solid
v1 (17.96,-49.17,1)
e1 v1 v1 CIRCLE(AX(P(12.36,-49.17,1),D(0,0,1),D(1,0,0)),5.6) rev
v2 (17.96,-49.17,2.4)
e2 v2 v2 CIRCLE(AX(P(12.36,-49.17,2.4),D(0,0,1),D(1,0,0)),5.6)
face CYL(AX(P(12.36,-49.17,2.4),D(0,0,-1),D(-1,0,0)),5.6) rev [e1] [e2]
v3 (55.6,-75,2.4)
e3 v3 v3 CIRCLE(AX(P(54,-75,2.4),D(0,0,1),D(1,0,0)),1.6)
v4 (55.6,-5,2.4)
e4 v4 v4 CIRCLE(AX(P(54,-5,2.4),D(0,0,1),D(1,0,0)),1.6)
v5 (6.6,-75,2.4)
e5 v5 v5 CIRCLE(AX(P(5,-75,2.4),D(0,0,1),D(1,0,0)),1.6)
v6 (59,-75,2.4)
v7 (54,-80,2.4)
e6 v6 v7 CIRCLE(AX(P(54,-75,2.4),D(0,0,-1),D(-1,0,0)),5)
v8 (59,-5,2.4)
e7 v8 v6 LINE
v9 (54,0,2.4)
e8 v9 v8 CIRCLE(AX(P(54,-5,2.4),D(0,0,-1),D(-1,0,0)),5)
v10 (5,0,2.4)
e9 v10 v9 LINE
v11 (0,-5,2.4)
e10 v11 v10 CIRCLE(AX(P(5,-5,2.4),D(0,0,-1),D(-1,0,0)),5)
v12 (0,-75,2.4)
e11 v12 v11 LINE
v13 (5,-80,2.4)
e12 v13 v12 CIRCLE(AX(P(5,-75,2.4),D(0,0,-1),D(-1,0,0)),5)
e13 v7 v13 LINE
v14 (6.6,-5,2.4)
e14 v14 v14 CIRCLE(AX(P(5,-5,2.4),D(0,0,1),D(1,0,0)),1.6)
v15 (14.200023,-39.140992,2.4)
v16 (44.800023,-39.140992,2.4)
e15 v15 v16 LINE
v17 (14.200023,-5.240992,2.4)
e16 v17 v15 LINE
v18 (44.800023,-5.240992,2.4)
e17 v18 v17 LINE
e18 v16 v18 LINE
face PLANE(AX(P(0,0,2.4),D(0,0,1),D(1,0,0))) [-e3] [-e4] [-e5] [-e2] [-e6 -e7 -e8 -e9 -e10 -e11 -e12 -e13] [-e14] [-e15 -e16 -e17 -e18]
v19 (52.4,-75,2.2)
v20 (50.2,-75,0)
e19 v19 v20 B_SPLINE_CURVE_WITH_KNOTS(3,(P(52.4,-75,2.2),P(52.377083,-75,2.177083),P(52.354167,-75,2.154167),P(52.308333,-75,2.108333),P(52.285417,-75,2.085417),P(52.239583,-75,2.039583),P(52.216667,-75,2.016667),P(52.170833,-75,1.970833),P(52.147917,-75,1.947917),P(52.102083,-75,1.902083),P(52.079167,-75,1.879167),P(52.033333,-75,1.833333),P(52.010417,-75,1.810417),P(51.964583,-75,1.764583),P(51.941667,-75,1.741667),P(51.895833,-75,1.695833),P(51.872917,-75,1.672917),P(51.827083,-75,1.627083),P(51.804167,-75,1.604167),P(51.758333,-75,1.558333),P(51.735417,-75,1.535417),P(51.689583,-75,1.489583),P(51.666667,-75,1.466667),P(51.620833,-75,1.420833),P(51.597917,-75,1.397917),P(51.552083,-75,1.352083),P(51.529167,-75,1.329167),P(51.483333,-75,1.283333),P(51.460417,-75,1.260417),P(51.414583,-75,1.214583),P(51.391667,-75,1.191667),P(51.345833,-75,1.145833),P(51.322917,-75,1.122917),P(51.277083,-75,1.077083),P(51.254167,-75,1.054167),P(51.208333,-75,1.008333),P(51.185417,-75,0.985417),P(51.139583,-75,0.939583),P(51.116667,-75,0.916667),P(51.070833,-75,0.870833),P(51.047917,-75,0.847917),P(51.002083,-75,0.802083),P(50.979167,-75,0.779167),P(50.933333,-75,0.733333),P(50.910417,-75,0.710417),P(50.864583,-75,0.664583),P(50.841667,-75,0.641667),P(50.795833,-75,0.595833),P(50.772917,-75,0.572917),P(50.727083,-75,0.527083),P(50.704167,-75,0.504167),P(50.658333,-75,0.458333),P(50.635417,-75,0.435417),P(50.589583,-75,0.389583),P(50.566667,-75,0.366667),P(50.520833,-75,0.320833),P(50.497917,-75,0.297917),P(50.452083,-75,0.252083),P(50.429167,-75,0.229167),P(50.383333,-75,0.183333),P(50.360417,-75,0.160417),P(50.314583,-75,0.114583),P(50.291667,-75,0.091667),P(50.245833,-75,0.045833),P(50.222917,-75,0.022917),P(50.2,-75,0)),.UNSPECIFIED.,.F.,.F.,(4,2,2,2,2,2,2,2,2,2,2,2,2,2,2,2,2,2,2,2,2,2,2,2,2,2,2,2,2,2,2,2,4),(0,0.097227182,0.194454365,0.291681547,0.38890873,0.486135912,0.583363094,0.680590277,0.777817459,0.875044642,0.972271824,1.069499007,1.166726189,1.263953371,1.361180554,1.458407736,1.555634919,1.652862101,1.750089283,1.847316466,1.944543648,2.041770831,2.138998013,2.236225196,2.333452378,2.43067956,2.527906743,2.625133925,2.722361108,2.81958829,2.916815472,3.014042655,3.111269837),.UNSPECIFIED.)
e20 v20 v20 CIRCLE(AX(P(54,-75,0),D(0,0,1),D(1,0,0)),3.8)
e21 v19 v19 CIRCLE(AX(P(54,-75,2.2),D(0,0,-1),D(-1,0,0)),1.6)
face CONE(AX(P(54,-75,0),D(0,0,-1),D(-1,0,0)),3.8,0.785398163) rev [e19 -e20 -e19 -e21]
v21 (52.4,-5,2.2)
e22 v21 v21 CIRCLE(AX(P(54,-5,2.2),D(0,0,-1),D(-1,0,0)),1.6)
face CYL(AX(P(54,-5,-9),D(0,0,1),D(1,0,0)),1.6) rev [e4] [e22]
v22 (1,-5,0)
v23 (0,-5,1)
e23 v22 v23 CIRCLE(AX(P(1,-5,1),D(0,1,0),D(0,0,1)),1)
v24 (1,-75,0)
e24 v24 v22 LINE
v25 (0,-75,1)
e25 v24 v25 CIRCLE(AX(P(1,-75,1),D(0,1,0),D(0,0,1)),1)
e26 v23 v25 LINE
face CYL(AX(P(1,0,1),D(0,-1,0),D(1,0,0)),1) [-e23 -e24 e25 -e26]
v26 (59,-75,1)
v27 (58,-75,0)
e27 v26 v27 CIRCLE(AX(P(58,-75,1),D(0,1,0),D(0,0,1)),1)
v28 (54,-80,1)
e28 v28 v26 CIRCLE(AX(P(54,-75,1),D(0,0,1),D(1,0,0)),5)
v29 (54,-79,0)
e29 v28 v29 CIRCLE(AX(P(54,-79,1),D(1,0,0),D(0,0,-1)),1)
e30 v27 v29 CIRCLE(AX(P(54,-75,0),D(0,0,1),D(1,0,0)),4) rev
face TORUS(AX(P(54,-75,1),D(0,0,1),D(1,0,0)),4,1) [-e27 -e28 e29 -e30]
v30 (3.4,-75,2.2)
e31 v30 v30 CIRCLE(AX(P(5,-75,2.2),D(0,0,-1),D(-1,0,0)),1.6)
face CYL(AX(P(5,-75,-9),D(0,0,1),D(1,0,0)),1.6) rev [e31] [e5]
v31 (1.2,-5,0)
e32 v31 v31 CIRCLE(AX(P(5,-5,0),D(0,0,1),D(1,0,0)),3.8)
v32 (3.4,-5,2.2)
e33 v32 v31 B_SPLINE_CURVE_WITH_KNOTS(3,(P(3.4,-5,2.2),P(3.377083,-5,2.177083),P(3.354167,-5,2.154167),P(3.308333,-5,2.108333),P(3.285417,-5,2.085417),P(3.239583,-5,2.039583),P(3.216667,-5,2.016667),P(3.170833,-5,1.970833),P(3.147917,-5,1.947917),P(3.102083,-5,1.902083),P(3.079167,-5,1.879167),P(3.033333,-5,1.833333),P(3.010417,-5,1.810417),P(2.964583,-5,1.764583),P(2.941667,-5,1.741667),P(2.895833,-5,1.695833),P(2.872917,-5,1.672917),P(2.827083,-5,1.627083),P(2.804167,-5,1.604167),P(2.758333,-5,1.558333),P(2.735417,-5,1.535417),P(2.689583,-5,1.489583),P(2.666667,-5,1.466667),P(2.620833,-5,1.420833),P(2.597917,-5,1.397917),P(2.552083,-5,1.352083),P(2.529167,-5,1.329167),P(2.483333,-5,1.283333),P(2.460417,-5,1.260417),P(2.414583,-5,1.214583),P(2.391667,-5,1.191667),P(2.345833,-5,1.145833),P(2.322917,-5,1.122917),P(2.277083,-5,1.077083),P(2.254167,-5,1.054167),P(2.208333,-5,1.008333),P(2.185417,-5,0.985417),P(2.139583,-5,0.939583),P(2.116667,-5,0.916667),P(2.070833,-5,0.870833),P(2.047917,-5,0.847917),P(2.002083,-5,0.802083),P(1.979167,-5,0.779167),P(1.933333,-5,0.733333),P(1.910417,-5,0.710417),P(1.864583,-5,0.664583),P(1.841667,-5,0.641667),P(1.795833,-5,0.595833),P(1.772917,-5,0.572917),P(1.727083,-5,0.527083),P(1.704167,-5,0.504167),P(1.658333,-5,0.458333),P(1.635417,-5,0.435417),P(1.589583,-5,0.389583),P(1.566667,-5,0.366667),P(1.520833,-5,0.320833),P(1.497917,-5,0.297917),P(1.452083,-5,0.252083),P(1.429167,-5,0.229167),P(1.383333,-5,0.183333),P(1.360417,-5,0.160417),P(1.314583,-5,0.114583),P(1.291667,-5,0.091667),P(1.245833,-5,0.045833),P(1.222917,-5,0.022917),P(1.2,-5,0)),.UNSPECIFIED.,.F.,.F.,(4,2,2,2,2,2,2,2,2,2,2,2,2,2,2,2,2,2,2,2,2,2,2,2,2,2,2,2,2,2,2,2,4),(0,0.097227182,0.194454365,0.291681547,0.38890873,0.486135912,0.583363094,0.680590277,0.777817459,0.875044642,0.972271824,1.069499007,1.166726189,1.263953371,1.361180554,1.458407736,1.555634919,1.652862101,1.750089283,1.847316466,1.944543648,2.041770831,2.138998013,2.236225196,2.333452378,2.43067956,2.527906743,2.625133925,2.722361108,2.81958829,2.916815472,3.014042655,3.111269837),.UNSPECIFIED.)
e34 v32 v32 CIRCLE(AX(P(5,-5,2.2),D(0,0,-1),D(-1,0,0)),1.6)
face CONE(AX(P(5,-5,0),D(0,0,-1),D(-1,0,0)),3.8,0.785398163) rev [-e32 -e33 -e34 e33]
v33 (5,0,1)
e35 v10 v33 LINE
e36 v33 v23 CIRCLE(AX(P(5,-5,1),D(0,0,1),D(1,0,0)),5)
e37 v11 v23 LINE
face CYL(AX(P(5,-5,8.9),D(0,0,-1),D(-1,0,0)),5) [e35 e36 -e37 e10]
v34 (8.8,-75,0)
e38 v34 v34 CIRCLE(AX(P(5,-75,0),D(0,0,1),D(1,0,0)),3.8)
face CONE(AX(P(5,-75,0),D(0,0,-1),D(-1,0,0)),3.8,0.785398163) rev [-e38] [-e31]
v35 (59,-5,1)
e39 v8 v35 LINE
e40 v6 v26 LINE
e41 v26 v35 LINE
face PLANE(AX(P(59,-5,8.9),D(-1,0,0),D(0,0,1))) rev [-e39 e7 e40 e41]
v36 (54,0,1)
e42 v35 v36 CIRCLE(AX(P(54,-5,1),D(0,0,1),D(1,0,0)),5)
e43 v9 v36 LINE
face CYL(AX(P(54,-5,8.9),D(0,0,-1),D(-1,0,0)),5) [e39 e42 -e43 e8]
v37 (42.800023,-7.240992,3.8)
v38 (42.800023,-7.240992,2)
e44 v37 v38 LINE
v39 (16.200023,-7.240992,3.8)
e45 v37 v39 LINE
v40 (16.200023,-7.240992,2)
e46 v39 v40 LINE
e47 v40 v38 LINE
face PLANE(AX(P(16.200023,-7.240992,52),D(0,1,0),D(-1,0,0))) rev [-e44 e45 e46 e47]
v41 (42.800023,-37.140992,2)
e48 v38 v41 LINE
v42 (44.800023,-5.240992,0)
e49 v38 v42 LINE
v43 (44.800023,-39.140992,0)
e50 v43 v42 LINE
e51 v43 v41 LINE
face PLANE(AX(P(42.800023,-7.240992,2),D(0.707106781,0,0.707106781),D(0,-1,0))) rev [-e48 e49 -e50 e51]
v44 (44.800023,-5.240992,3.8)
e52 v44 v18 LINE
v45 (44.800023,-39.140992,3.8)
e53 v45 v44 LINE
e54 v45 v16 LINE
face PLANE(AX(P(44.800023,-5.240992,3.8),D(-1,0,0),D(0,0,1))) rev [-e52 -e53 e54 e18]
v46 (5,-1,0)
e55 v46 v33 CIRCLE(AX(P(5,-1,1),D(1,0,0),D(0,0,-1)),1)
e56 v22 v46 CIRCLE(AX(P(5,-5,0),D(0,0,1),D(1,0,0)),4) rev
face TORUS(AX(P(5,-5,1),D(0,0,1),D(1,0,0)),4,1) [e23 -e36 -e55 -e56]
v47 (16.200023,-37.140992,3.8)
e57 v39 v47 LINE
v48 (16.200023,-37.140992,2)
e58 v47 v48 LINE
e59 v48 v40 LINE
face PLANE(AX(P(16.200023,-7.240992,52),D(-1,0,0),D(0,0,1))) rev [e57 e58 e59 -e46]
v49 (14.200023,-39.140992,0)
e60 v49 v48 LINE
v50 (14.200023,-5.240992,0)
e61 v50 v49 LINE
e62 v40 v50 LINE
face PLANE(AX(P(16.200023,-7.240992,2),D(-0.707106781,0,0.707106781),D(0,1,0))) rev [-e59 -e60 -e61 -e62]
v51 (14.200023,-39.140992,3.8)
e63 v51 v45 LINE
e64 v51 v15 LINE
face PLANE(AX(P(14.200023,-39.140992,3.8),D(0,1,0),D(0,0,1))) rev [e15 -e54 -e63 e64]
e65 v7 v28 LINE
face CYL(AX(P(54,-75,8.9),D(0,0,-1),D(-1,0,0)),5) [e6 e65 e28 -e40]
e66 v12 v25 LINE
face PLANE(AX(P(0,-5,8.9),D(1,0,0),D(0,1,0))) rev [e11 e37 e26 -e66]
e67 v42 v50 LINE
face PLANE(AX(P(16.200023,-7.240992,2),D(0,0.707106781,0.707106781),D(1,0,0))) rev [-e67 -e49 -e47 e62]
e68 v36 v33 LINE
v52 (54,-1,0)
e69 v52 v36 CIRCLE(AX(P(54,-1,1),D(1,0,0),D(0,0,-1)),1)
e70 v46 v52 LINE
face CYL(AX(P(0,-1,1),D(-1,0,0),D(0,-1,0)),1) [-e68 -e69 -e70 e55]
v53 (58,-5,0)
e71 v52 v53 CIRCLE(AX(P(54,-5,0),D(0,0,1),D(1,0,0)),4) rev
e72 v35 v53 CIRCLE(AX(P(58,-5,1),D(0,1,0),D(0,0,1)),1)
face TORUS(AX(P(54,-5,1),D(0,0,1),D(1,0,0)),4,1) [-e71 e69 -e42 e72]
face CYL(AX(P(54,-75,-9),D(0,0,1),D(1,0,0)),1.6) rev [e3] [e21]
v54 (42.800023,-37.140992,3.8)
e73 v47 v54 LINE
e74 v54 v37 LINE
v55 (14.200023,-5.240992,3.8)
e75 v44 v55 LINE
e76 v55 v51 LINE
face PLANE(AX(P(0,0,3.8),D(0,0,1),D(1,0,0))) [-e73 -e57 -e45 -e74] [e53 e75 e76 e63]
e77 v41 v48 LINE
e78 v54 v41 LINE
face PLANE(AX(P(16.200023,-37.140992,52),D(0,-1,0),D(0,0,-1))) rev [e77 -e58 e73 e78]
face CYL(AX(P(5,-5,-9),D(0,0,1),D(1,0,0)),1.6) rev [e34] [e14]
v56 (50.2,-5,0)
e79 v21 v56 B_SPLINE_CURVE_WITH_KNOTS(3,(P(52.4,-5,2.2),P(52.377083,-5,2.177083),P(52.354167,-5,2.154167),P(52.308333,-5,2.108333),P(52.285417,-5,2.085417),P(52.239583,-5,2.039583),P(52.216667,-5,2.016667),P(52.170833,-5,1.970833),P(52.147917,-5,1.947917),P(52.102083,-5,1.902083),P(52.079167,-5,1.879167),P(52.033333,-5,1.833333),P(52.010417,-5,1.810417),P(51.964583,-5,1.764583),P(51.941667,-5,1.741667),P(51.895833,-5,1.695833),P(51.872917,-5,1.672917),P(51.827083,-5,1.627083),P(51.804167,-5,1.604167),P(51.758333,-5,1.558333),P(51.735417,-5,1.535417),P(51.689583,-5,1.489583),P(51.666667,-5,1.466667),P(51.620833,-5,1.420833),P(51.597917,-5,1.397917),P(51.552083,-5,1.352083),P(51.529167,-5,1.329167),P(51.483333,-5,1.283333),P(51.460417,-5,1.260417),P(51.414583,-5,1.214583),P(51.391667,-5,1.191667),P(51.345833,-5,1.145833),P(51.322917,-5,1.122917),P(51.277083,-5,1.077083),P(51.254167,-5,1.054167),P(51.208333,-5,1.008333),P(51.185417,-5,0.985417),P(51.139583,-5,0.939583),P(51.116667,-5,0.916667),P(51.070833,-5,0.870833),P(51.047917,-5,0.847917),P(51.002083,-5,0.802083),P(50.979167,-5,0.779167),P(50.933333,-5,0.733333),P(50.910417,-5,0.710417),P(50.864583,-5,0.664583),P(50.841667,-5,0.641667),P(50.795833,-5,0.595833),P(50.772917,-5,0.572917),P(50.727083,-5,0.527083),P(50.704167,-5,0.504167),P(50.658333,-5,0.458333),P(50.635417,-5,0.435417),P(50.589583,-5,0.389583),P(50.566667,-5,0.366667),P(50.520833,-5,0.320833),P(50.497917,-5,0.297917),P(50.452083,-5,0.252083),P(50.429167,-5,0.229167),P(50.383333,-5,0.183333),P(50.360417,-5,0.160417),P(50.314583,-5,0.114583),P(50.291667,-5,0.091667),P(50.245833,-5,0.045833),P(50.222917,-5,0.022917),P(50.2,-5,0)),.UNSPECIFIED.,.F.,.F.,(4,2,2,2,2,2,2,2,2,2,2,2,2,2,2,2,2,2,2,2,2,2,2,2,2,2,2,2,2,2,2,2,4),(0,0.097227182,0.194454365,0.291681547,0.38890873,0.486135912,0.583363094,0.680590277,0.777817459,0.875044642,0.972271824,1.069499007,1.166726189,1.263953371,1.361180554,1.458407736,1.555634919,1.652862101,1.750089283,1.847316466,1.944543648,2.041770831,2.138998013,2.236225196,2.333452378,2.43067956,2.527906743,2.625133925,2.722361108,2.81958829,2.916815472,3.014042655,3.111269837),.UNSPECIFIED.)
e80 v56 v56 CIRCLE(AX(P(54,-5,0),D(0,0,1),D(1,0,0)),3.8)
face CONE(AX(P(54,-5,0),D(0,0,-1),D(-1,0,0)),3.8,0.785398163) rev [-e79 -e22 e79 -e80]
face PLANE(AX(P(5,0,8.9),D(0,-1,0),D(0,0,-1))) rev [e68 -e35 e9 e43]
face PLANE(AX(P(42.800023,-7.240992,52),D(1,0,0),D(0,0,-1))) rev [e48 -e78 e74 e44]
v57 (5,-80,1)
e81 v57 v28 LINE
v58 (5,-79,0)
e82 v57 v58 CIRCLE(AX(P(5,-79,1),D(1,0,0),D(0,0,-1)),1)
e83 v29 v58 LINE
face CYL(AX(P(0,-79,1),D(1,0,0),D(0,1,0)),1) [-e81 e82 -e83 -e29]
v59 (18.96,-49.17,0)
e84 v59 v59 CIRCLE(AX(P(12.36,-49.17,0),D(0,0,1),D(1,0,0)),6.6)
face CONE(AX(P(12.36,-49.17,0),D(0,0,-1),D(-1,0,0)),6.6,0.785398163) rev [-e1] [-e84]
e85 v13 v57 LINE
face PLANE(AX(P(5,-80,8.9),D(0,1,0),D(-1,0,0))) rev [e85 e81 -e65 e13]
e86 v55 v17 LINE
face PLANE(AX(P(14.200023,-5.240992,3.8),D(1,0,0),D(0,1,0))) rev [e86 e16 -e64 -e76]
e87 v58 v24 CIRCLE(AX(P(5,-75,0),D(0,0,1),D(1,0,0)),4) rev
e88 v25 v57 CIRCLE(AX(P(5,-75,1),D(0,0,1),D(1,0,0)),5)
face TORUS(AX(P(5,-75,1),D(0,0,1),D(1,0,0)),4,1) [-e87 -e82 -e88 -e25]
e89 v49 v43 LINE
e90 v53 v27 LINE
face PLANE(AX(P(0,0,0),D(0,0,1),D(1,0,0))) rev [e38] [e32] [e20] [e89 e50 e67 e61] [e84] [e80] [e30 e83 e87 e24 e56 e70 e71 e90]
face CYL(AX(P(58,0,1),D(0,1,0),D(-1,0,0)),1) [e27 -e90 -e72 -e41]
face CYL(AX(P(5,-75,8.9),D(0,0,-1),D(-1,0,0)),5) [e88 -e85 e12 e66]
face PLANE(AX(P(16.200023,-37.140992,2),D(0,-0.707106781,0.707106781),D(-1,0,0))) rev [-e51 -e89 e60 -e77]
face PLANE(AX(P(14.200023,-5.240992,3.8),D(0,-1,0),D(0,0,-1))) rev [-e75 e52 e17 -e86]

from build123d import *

# Parameters (mm, degrees)
SKETCH_1_W           = 59
SKETCH_1_H           = 80
SKETCH_1_R           = 5.6
EXTRUDE_1_DEPTH      = 2.4
SKETCH_4_W           = 59
SKETCH_4_H           = 80
EXTRUDE_6_DEPTH      = 5.5
FILLET_1_R           = 5
FILLET_2_R           = 5
SKETCH_14_R          = 3
SKETCH_14_R_2        = 1.3
EXTRUDE_7_DEPTH      = 6.5
EXTRUDE_10_DEPTH     = 1
FILLET_3_R           = 1
CUT_EXTRUDE_1_DEPTH  = 10
SKETCH_23_W          = 26.6
SKETCH_23_H          = 29.9
CUT_EXTRUDE_4_DEPTH  = 52
SKETCH_24_W          = 26.6
SKETCH_24_H          = 5
EXTRUDE_11_DEPTH     = 0.2
SKETCH_25_W          = 26.6
SKETCH_25_H          = 5
EXTRUDE_12_DEPTH     = 0.2
SKETCH_26_R          = 3.14740537
SKETCH_26_R_2        = 1.3
EXTRUDE_13_DEPTH     = 6.5
CUT_EXTRUDE_5_DEPTH  = 0.6
CHAMFER_1_SIZE       = 2
CHAMFER_2_SIZE       = 1
EXTRUDE_16_DEPTH     = 6.5
EXTRUDE_16_2_DEPTH   = 6.5
EXTRUDE_16_3_DEPTH   = 6.5
EXTRUDE_16_4_DEPTH   = 6.5
EXTRUDE_16_5_DEPTH   = 6.5
EXTRUDE_16_6_DEPTH   = 6.5
EXTRUDE_17_REACH     = 101.616
SKETCH_34_R          = 1.3
CUT_EXTRUDE_7_DEPTH  = 10
SKETCH_33_W          = 70.771509838
SKETCH_33_H          = 90.701063175
CUT_EXTRUDE_6_DEPTH  = 10
CHAMFER_3_SIZE       = 2.5
SKETCH_35_W          = 30.6
SKETCH_35_H          = 33.9
SKETCH_35_W_2        = 26.6
SKETCH_35_H_2        = 29.9
EXTRUDE_18_DEPTH     = 1.4
SKETCH_37_R          = 1.6
CUT_EXTRUDE_11_DEPTH = 11.4


with BuildPart() as part:
    # Эскиз1 → Бобышка-Вытянуть1 (new body)
    with BuildSketch(Plane.XY):
        with Locations((29.5, -40)):
            Rectangle(SKETCH_1_W, SKETCH_1_H)
        with Locations((12.36, -49.17)):
            Circle(SKETCH_1_R, mode=Mode.SUBTRACT)
    extrude(amount=EXTRUDE_1_DEPTH)

    # Эскиз4 → Бобышка-Вытянуть6 (add)
    with BuildSketch(Plane.XY.offset(2.4)):
        with Locations((29.5, -40)):
            Rectangle(SKETCH_4_W, SKETCH_4_H)
        with BuildLine():
            Line((5.1, -2), (53.9, -2))
            ThreePointArc((53.9, -2), (56.092031022, -2.907968978), (57, -5.1))
            Line((57, -5.1), (57, -74.9))
            ThreePointArc((57, -74.9), (56.092031022, -77.092031022), (53.9, -78))
            Line((53.9, -78), (5.1, -78))
            ThreePointArc((5.1, -78), (2.907968978, -77.092031022), (2, -74.9))
            Line((2, -74.9), (2, -5.1))
            ThreePointArc((2, -5.1), (2.907968978, -2.907968978), (5.1, -2))
        make_face(mode=Mode.SUBTRACT)
    extrude(amount=EXTRUDE_6_DEPTH)

    # Скругление1
    fillet_1_edges = [part.edges().sort_by_distance(p)[0] for p in [
        (0, 0, 3.95),
    ]]
    fillet(fillet_1_edges, radius=FILLET_1_R)

    # Скругление2
    fillet_2_edges = [part.edges().sort_by_distance(p)[0] for p in [
        (59, 0, 3.95),
        (59, -80, 3.95),
        (0, -80, 3.95),
    ]]
    fillet(fillet_2_edges, radius=FILLET_2_R)

    # Эскиз14 → Бобышка-Вытянуть7 (add)
    # profile 1 of 4: a face of its own
    with BuildSketch(Plane.XY.offset(2.4)):
        with Locations(Location((5, -5, 0), (0, 0, 180.947144451))):
            Circle(SKETCH_14_R)
        with Locations(Location((5, -5, 0), (0, 0, 180))):
            Circle(SKETCH_14_R_2, mode=Mode.SUBTRACT)
    # profile 2 of 4: a face of its own
    with BuildSketch(Plane.XY.offset(2.4)):
        with Locations(Location((5, -75, 0), (0, 0, 179.052855549))):
            Circle(SKETCH_14_R)
        with Locations(Location((5, -75, 0), (0, 0, 180))):
            Circle(SKETCH_14_R_2, mode=Mode.SUBTRACT)
    # profile 3 of 4: a face of its own
    with BuildSketch(Plane.XY.offset(2.4)):
        with Locations(Location((54, -75, 0), (0, 0, 269.052855549))):
            Circle(SKETCH_14_R)
        with Locations(Location((54, -75, 0), (0, 0, 180))):
            Circle(SKETCH_14_R_2, mode=Mode.SUBTRACT)
    # profile 4 of 4: a face of its own
    with BuildSketch(Plane.XY.offset(2.4)):
        with Locations(Location((54, -5, 0), (0, 0, 90.947144451))):
            Circle(SKETCH_14_R)
        with Locations(Location((54, -5, 0), (0, 0, 180))):
            Circle(SKETCH_14_R_2, mode=Mode.SUBTRACT)
    extrude(amount=EXTRUDE_7_DEPTH)

    # Скругление3
    fillet_3_edges = [part.edges().sort_by_distance(p)[0] for p in [
        (0, -40, 0),
        (1.464466094, -1.464466094, 0),
        (29.5, -80, 0),
        (29.5, 0, 0),
        (59, -40, 0),
        (57.535533906, -1.464466094, 0),
        (57.535533906, -78.535533906, 0),
        (1.464466094, -78.535533906, 0),
    ]]
    fillet(fillet_3_edges, radius=FILLET_3_R)


with BuildPart() as body_2:
    # Эскиз15 → Бобышка-Вытянуть10 (new body)
    with BuildSketch(Plane.XY.offset(7.9)):
        with BuildLine():
            Line((5, 0), (54, 0))
            ThreePointArc((54, 0), (57.535533906, -1.464466094), (59, -5))
            Line((59, -5), (59, -75))
            ThreePointArc((59, -75), (57.535533906, -78.535533906), (54, -80))
            Line((54, -80), (5, -80))
            ThreePointArc((5, -80), (1.464466094, -78.535533906), (0, -75))
            Line((0, -75), (0, -5))
            ThreePointArc((0, -5), (1.464466094, -1.464466094), (5, 0))
        make_face()
        with BuildLine():
            Line((5, -1), (54, -1))
            ThreePointArc((54, -1), (56.828427125, -2.171572875), (58, -5))
            Line((58, -5), (58, -75))
            ThreePointArc((58, -75), (56.828427125, -77.828427125), (54, -79))
            Line((54, -79), (5, -79))
            ThreePointArc((5, -79), (2.171572875, -77.828427125), (1, -75))
            Line((1, -75), (1, -5))
            ThreePointArc((1, -5), (2.171572875, -2.171572875), (5, -1))
        make_face(mode=Mode.SUBTRACT)
    extrude(amount=EXTRUDE_10_DEPTH)


with BuildPart() as cut_extrude_1_tool:
    # Эскиз20 → Вырез-Вытянуть1 (new body)
    with BuildSketch(Plane(origin=(59, 0, 0), x_dir=(0, 0, -1), z_dir=(1, 0, 0))):
        with BuildLine():
            Line((-8.9, -11.15), (-5.2, -11.15))
            ThreePointArc((-5.2, -11.15), (-4.492893219, -11.442893219), (-4.2, -12.15))
            Line((-4.2, -12.15), (-4.2, -18.25))
            ThreePointArc((-4.2, -18.25), (-4.492893219, -18.957106781), (-5.2, -19.25))
            Line((-5.2, -19.25), (-8.9, -19.25))
            Line((-8.9, -19.25), (-8.9, -11.15))
        make_face()
    extrude(amount=-CUT_EXTRUDE_1_DEPTH)


with BuildPart() as part_1:
    add(part.part)

    # Вырез-Вытянуть1: cut by cut_extrude_1_tool
    add(cut_extrude_1_tool.part, mode=Mode.SUBTRACT)

    # Эскиз23 → Вырез-Вытянуть4 (cut)
    with BuildSketch(Plane(origin=(0, 0, 0), x_dir=(-1, 0, 0), z_dir=(0, 0, -1))):
        with Locations((-29.500023272, -22.190991649)):
            Rectangle(SKETCH_23_W, SKETCH_23_H)
    extrude(amount=-CUT_EXTRUDE_4_DEPTH, mode=Mode.SUBTRACT)

    # Эскиз24 → Бобышка-Вытянуть11 (add)
    with BuildSketch(Plane.XY.offset(2.4)):
        with Locations((29.500023272, -4.740991649)):
            Rectangle(SKETCH_24_W, SKETCH_24_H)
    extrude(amount=EXTRUDE_11_DEPTH)

    # Эскиз25 → Бобышка-Вытянуть12 (add)
    with BuildSketch(Plane.XY.offset(2.4)):
        with Locations((29.500023272, -39.640991649)):
            Rectangle(SKETCH_25_W, SKETCH_25_H)
    extrude(amount=EXTRUDE_12_DEPTH)


with BuildPart() as body_2_1:
    add(body_2.part)

    # Вырез-Вытянуть1: cut by cut_extrude_1_tool
    add(cut_extrude_1_tool.part, mode=Mode.SUBTRACT)


    add(part_1.part)  # Бобышка-Вытянуть13 merges part
    # Эскиз26 → Бобышка-Вытянуть13 (add)
    with BuildSketch(Plane.XY.offset(2.4)):
        with Locations(Location((46.9, -5.7, 0), (0, 0, 180))):
            Circle(SKETCH_26_R)
        with Locations(Location((46.9, -5.7, 0), (0, 0, 180))):
            Circle(SKETCH_26_R_2, mode=Mode.SUBTRACT)
    extrude(amount=EXTRUDE_13_DEPTH)

    # Эскиз27 → Вырез-Вытянуть5 (cut)
    with BuildSketch(Plane.XY.offset(7.9)):
        with BuildLine():
            Line((58, -75), (58, -19.25))
            Line((58, -19.25), (57, -19.25))
            Line((57, -19.25), (57, -74.9))
            ThreePointArc((57, -74.9), (56.999897526, -74.925205779), (56.999590109, -74.950409891))
            ThreePointArc((56.999590109, -74.950409891), (56.121320344, -77.121320344), (53.950409891, -77.999590109))
            ThreePointArc((53.950409891, -77.999590109), (53.925205779, -77.999897526), (53.9, -78))
            Line((53.9, -78), (5.1, -78))
            ThreePointArc((5.1, -78), (5.074794221, -77.999897526), (5.049590109, -77.999590109))
            ThreePointArc((5.049590109, -77.999590109), (2.878679656, -77.121320344), (2.000409891, -74.950409891))
            ThreePointArc((2.000409891, -74.950409891), (2.000102474, -74.925205779), (2, -74.9))
            Line((2, -74.9), (2, -5.1))
            ThreePointArc((2, -5.1), (2.000102474, -5.074794221), (2.000409891, -5.049590109))
            ThreePointArc((2.000409891, -5.049590109), (2.878679656, -2.878679656), (5.049590109, -2.000409891))
            ThreePointArc((5.049590109, -2.000409891), (5.074794221, -2.000102474), (5.1, -2))
            Line((5.1, -2), (53.9, -2))
            ThreePointArc((53.9, -2), (53.925205779, -2.000102474), (53.950409891, -2.000409891))
            ThreePointArc((53.950409891, -2.000409891), (56.121320344, -2.878679656), (56.999590109, -5.049590109))
            ThreePointArc((56.999590109, -5.049590109), (56.999897526, -5.074794221), (57, -5.1))
            Line((57, -5.1), (57, -11.15))
            Line((57, -11.15), (58, -11.15))
            Line((58, -11.15), (58, -5))
            ThreePointArc((58, -5), (56.828427125, -2.171572875), (54, -1))
            Line((54, -1), (5, -1))
            ThreePointArc((5, -1), (2.171572875, -2.171572875), (1, -5))
            Line((1, -5), (1, -75))
            ThreePointArc((1, -75), (2.171572875, -77.828427125), (5, -79))
            Line((5, -79), (54, -79))
            ThreePointArc((54, -79), (56.828427125, -77.828427125), (58, -75))
        make_face()
    extrude(amount=-CUT_EXTRUDE_5_DEPTH, mode=Mode.SUBTRACT)

    # Фаска1
    chamfer_1_edges = [body_2_1.edges().sort_by_distance(p)[0] for p in [
        (16.200023272, -22.190991649, 0),
        (29.500023272, -37.140991649, 0),
        (42.800023272, -22.190991649, 0),
        (29.500023272, -7.240991649, 0),
    ]]
    chamfer(chamfer_1_edges, length=CHAMFER_1_SIZE)

    # Фаска2
    chamfer_2_edges = [body_2_1.edges().sort_by_distance(p)[0] for p in [
        (6.76, -49.17, 0),
    ]]
    chamfer(chamfer_2_edges, length=CHAMFER_2_SIZE)

    # Бобышка-Вытянуть17: up to this face of the body (flat: up to its plane)
    extrude_17_end = Plane(body_2_1.part.faces().sort_by_distance((49.958383303, -5.7, 8.9))[0])
    # Эскиз31 → Бобышка-Вытянуть17 (add, up to the picked face)
    with BuildSketch(Plane.XY.offset(2.4), mode=Mode.PRIVATE) as extrude_17_sk1:
        Polygon((5, -2), (8, -2), (8, -5), align=None)
    extrude_17_tool1 = split(extrude(extrude_17_sk1.sketch, amount=EXTRUDE_17_REACH, mode=Mode.PRIVATE), bisect_by=extrude_17_end, keep=Keep.BOTH, mode=Mode.PRIVATE)
    # Эскиз31 → Бобышка-Вытянуть17 (add, up to the picked face)
    with BuildSketch(Plane.XY.offset(2.4), mode=Mode.PRIVATE) as extrude_17_sk2:
        Polygon((5, -8), (2, -8), (2, -5.1), align=None)
    extrude_17_tool2 = split(extrude(extrude_17_sk2.sketch, amount=EXTRUDE_17_REACH, mode=Mode.PRIVATE), bisect_by=extrude_17_end, keep=Keep.BOTH, mode=Mode.PRIVATE)
    # Эскиз31 → Бобышка-Вытянуть17 (add, up to the picked face)
    with BuildSketch(Plane.XY.offset(2.4), mode=Mode.PRIVATE) as extrude_17_sk3:
        Polygon((50.04740537, -5.7), (50.04740537, -2), (43.75259463, -2), (43.753891914, -5.790357503), (46.9, -2.55259463), align=None)
    extrude_17_tool3 = split(extrude(extrude_17_sk3.sketch, amount=EXTRUDE_17_REACH, mode=Mode.PRIVATE), bisect_by=extrude_17_end, keep=Keep.BOTH, mode=Mode.PRIVATE)
    # Эскиз31 → Бобышка-Вытянуть17 (add, up to the picked face)
    with BuildSketch(Plane.XY.offset(2.4), mode=Mode.PRIVATE) as extrude_17_sk4:
        Polygon((57, -5), (54, -8), (57, -8), align=None)
    extrude_17_tool4 = split(extrude(extrude_17_sk4.sketch, amount=EXTRUDE_17_REACH, mode=Mode.PRIVATE), bisect_by=extrude_17_end, keep=Keep.BOTH, mode=Mode.PRIVATE)
    # Эскиз31 → Бобышка-Вытянуть17 (add, up to the picked face)
    with BuildSketch(Plane.XY.offset(2.4), mode=Mode.PRIVATE) as extrude_17_sk5:
        Polygon((54, -2), (51, -2), (51, -5), align=None)
    extrude_17_tool5 = split(extrude(extrude_17_sk5.sketch, amount=EXTRUDE_17_REACH, mode=Mode.PRIVATE), bisect_by=extrude_17_end, keep=Keep.BOTH, mode=Mode.PRIVATE)
    add(extrude_17_tool1.solids().sort_by(Axis((7, -3, 2.4), (0, 0, 1)))[0])
    add(extrude_17_tool2.solids().sort_by(Axis((3, -7.033333, 2.4), (0, 0, 1)))[0])
    add(extrude_17_tool3.solids().sort_by(Axis((49.973926, -3.85, 2.4), (0, 0, 1)))[0])
    add(extrude_17_tool4.solids().sort_by(Axis((56, -7, 2.4), (0, 0, 1)))[0])
    add(extrude_17_tool5.solids().sort_by(Axis((52, -3, 2.4), (0, 0, 1)))[0])

    # Эскиз34 → Вырез-Вытянуть7 (cut)
    with BuildSketch(Plane.XY.offset(8.9)):
        with Locations(Location((5, -75, 0), (0, 0, 180))):
            Circle(SKETCH_34_R)
        with Locations(Location((54, -75, 0), (0, 0, 180))):
            Circle(SKETCH_34_R)
        with Locations(Location((54, -5, 0), (0, 0, 180))):
            Circle(SKETCH_34_R)
        with Locations(Location((5, -5, 0), (0, 0, 180))):
            Circle(SKETCH_34_R)
    extrude(amount=-CUT_EXTRUDE_7_DEPTH, mode=Mode.SUBTRACT)


with BuildPart() as body_2_2:
    # Эскиз30 → Бобышка-Вытянуть16 (new body)
    with BuildSketch(Plane.XY.offset(2.4)):
        with BuildLine():
            Line((5.049590109, -77.999590109), (8, -78))
            Line((8, -78), (8, -75))
            ThreePointArc((8, -75), (7.138781233, -77.103714533), (5.049590109, -77.999590109))
        make_face()
    extrude(amount=EXTRUDE_16_DEPTH)


with BuildPart() as body_3:
    # Эскиз30 → Extrude 16 2 (new body)
    with BuildSketch(Plane.XY.offset(2.4)):
        with BuildLine():
            ThreePointArc((5, -72), (7.121320344, -72.878679656), (8, -75))
            Line((8, -75), (8, -72))
            Line((8, -72), (5, -72))
        make_face()
    extrude(amount=EXTRUDE_16_2_DEPTH)


with BuildPart() as body_4:
    # Эскиз30 → Extrude 16 3 (new body)
    with BuildSketch(Plane.XY.offset(2.4)):
        with BuildLine():
            ThreePointArc((2.000409891, -74.950409891), (2.896285467, -72.861218767), (5, -72))
            Line((5, -72), (2, -72))
            Line((2, -72), (2.000409891, -74.950409891))
        make_face()
    extrude(amount=EXTRUDE_16_3_DEPTH)


with BuildPart() as body_5:
    # Эскиз30 → Extrude 16 4 (new body)
    with BuildSketch(Plane.XY.offset(2.4)):
        with BuildLine():
            Line((57, -72), (54, -72))
            ThreePointArc((54, -72), (56.103714533, -72.861218767), (56.999590109, -74.950409891))
            ThreePointArc((56.999590109, -74.950409891), (56.999897526, -74.925205779), (57, -74.9))
            Line((57, -74.9), (57, -72))
        make_face()
    extrude(amount=EXTRUDE_16_4_DEPTH)


with BuildPart() as body_6:
    # Эскиз30 → Extrude 16 5 (new body)
    with BuildSketch(Plane.XY.offset(2.4)):
        with BuildLine():
            ThreePointArc((51, -75), (51.878679656, -72.878679656), (54, -72))
            Line((54, -72), (51, -72))
            Line((51, -72), (51, -75))
        make_face()
    extrude(amount=EXTRUDE_16_5_DEPTH)


with BuildPart() as body_7:
    # Эскиз30 → Extrude 16 6 (new body)
    with BuildSketch(Plane.XY.offset(2.4)):
        with BuildLine():
            ThreePointArc((53.950409891, -77.999590109), (51.861218767, -77.103714533), (51, -75))
            Line((51, -75), (51, -78))
            Line((51, -78), (53.9, -78))
            ThreePointArc((53.9, -78), (53.925205779, -77.999897526), (53.950409891, -77.999590109))
        make_face()
    extrude(amount=EXTRUDE_16_6_DEPTH)


with BuildPart() as cut_extrude_6_tool:
    # Эскиз33 → Вырез-Вытянуть6 (new body)
    with BuildSketch(Plane.XY.offset(2.4)):
        with Locations((30.732946322, -41.484926606)):
            Rectangle(SKETCH_33_W, SKETCH_33_H)
    extrude(amount=CUT_EXTRUDE_6_DEPTH)


with BuildPart() as body_2_3:
    add(body_2_1.part)

    # Вырез-Вытянуть6: cut by cut_extrude_6_tool
    add(cut_extrude_6_tool.part, mode=Mode.SUBTRACT)

    # Фаска3
    # the kernel refuses this chamfer: 2.5 mm, written as the material it takes off along each edge
    with BuildSketch(Plane(origin=(5, -5, 0), x_dir=(-1, 0, 0), z_dir=(0, 1, 0))) as chamfer_3_piece_1:
        Polygon((1.3 + CHAMFER_3_SIZE, 0), (1.3, CHAMFER_3_SIZE), (1.3, 0), align=None)
    revolve(axis=Axis((5, -5, 0), (0, 0, 1)), mode=Mode.SUBTRACT)
    with BuildSketch(Plane(origin=(5, -75, 0), x_dir=(-1, 0, 0), z_dir=(0, 1, 0))) as chamfer_3_piece_2:
        Polygon((1.3 + CHAMFER_3_SIZE, 0), (1.3, CHAMFER_3_SIZE), (1.3, 0), align=None)
    revolve(axis=Axis((5, -75, 0), (0, 0, 1)), mode=Mode.SUBTRACT)
    with BuildSketch(Plane(origin=(54, -75, 0), x_dir=(-1, 0, 0), z_dir=(0, 1, 0))) as chamfer_3_piece_3:
        Polygon((1.3 + CHAMFER_3_SIZE, 0), (1.3, CHAMFER_3_SIZE), (1.3, 0), align=None)
    revolve(axis=Axis((54, -75, 0), (0, 0, 1)), mode=Mode.SUBTRACT)
    with BuildSketch(Plane(origin=(54, -5, 0), x_dir=(-1, 0, 0), z_dir=(0, 1, 0))) as chamfer_3_piece_4:
        Polygon((1.3 + CHAMFER_3_SIZE, 0), (1.3, CHAMFER_3_SIZE), (1.3, 0), align=None)
    revolve(axis=Axis((54, -5, 0), (0, 0, 1)), mode=Mode.SUBTRACT)

    # Эскиз35 → Бобышка-Вытянуть18 (add)
    with BuildSketch(Plane.XY.offset(2.4)):
        with Locations((29.500023272, -22.190991649)):
            Rectangle(SKETCH_35_W, SKETCH_35_H)
        with Locations((29.500023272, -22.190991649)):
            Rectangle(SKETCH_35_W_2, SKETCH_35_H_2, mode=Mode.SUBTRACT)
    extrude(amount=EXTRUDE_18_DEPTH)

    # Эскиз37 → Вырез-Вытянуть11 (cut)
    with BuildSketch(Plane.XY.offset(2.4)):
        with Locations((5, -5)):
            Circle(SKETCH_37_R)
        with Locations((54, -5)):
            Circle(SKETCH_37_R)
        with Locations((54, -75)):
            Circle(SKETCH_37_R)
        with Locations((5, -75)):
            Circle(SKETCH_37_R)
    extrude(amount=-CUT_EXTRUDE_11_DEPTH, mode=Mode.SUBTRACT)


with BuildPart() as body_2_2_1:
    add(body_2_2.part)

    # Вырез-Вытянуть6: cut by cut_extrude_6_tool
    add(cut_extrude_6_tool.part, mode=Mode.SUBTRACT)


with BuildPart() as body_3_1:
    add(body_3.part)

    # Вырез-Вытянуть6: cut by cut_extrude_6_tool
    add(cut_extrude_6_tool.part, mode=Mode.SUBTRACT)


with BuildPart() as body_4_1:
    add(body_4.part)

    # Вырез-Вытянуть6: cut by cut_extrude_6_tool
    add(cut_extrude_6_tool.part, mode=Mode.SUBTRACT)


with BuildPart() as body_5_1:
    add(body_5.part)

    # Вырез-Вытянуть6: cut by cut_extrude_6_tool
    add(cut_extrude_6_tool.part, mode=Mode.SUBTRACT)


with BuildPart() as body_6_1:
    add(body_6.part)

    # Вырез-Вытянуть6: cut by cut_extrude_6_tool
    add(cut_extrude_6_tool.part, mode=Mode.SUBTRACT)


with BuildPart() as body_7_1:
    add(body_7.part)

    # Вырез-Вытянуть6: cut by cut_extrude_6_tool
    add(cut_extrude_6_tool.part, mode=Mode.SUBTRACT)


solid = body_2_3.part
